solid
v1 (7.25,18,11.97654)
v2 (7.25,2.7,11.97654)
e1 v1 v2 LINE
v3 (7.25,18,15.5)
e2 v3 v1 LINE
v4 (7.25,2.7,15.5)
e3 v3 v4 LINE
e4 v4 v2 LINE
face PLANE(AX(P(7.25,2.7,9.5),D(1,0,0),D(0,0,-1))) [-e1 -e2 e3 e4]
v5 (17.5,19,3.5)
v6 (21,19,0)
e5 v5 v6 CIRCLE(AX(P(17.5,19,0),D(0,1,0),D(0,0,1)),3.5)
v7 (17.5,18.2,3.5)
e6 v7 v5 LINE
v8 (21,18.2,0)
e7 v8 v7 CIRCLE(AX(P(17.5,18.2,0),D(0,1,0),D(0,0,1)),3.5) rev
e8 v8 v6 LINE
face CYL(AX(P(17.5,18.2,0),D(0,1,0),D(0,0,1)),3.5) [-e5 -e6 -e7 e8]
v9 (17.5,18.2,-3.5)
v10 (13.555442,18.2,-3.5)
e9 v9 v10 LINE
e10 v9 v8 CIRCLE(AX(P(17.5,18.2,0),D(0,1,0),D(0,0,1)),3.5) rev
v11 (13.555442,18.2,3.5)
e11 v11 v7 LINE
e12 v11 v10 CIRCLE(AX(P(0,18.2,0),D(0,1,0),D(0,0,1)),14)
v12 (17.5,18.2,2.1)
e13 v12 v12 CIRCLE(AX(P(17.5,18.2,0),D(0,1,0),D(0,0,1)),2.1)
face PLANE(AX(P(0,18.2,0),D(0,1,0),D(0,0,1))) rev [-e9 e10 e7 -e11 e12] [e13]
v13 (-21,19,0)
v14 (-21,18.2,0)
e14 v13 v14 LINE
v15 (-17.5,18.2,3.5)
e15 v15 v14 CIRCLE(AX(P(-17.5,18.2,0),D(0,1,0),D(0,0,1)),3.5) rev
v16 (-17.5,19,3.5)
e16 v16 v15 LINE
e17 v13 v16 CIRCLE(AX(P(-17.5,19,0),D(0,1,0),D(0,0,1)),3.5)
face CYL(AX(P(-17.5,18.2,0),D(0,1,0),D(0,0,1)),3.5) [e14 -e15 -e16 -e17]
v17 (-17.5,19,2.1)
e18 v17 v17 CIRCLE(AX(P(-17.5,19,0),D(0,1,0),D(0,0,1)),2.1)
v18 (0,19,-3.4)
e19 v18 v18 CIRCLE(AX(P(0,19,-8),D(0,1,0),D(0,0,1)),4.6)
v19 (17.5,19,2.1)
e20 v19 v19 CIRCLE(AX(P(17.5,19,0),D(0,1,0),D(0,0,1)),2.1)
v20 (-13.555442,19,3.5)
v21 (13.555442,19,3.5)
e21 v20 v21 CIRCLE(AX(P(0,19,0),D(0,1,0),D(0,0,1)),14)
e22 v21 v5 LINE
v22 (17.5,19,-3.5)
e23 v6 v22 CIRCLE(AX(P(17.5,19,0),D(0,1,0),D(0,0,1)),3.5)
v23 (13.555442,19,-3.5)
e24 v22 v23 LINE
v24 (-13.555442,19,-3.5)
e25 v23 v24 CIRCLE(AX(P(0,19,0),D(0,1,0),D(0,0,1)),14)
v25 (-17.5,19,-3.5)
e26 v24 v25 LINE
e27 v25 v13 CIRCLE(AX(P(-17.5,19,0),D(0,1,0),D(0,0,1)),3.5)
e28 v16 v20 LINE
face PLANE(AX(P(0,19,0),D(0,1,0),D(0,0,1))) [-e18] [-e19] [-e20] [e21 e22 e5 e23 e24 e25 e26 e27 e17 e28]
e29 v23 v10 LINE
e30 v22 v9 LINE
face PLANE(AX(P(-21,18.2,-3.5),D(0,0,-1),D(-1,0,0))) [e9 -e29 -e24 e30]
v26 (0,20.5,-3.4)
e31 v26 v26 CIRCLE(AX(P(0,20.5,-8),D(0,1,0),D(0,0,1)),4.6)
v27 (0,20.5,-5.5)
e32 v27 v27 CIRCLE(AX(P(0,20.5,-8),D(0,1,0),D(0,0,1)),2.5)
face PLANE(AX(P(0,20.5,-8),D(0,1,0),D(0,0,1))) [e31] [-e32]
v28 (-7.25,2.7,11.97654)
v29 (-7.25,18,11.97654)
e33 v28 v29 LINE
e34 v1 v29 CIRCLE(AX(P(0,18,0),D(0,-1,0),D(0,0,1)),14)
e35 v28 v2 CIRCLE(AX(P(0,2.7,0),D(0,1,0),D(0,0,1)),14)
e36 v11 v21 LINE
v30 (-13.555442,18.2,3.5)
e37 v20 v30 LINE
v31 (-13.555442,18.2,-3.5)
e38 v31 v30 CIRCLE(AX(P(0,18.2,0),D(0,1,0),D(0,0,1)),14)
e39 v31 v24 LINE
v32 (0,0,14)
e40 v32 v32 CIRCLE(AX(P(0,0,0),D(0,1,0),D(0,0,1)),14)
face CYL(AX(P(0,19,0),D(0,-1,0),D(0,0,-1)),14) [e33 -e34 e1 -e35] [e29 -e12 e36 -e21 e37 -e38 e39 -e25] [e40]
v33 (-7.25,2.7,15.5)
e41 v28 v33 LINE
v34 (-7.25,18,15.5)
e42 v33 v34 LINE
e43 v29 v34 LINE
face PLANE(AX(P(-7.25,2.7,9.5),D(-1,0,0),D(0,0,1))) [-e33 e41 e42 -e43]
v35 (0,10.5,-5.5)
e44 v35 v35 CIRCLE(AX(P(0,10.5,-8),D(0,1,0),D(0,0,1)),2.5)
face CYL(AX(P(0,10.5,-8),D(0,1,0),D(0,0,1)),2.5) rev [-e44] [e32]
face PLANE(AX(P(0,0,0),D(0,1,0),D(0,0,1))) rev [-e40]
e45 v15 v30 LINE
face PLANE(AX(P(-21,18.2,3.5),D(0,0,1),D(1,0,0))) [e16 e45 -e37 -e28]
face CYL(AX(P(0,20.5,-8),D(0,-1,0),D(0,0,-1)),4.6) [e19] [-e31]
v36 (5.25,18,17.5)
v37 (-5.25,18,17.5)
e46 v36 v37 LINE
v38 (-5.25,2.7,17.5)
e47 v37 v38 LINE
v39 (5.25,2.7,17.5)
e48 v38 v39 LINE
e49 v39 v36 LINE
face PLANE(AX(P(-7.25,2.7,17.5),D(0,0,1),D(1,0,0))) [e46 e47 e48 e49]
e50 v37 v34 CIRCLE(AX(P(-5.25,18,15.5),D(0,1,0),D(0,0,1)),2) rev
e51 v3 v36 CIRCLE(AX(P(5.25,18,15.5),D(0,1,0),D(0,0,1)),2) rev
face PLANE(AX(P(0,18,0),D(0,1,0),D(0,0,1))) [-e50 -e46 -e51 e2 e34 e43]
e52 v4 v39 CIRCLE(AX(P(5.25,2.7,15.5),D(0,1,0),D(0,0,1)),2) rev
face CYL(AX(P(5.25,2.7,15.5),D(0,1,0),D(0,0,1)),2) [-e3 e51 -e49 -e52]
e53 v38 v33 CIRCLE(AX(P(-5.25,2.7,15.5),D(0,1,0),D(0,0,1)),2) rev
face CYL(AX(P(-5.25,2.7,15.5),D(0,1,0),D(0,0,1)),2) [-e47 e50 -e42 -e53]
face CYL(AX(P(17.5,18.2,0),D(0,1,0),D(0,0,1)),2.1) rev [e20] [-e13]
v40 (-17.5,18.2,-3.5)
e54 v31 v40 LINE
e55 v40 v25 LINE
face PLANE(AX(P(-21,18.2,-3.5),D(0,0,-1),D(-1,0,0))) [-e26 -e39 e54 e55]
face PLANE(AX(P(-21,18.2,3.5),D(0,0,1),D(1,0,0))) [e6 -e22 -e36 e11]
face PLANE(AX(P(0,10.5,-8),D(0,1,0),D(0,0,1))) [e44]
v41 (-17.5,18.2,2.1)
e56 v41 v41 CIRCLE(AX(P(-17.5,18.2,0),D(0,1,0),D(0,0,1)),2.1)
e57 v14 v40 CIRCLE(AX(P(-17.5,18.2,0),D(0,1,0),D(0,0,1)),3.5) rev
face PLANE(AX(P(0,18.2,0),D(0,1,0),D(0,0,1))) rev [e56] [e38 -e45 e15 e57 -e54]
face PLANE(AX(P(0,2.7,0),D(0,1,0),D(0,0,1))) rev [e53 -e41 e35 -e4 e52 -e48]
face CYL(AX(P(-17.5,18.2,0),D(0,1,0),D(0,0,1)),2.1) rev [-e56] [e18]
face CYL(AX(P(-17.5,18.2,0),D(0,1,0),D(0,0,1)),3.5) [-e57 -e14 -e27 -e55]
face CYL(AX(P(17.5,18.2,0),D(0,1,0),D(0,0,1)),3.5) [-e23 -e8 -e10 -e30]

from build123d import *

# Parameters (mm, degrees)
ESQUISSE1_R             = 14
BOSS_EXTRU_1_DEPTH      = 19
ESQUISSE2_W             = 42
ESQUISSE2_H             = 7
ESQUISSE2_R             = 2.1
BOSS_EXTRU_2_DEPTH      = 0.8
CONG_1_R                = 3.5
ESQUISSE3_W             = 14.5
ESQUISSE3_H             = 8
BOSS_EXTRU_3_DEPTH      = 16.3
CONG_2_R                = 2
ESQUISSE4_R             = 4.6
BOSS_EXTRU_4_DEPTH      = 1.5
ESQUISSE5_R             = 2.5
BOSS_EXTRU_5_DEPTH      = 8.5
ESQUISSE6_W             = 12.644639
ESQUISSE6_H             = 4.455106
ESQUISSE6_W_2           = 15.068741
ESQUISSE6_H_2           = 4.782687
ENL_V_MAT_EXTRU_1_DEPTH = 6
ENL_V_START             = -1
ENL_V_MAT_EXTRU_2_DEPTH = 1
ENL_V_START_2           = -18.5
ESQUISSE8_R             = 2.5
ENL_V_MAT_EXTRU_3_DEPTH = 18.5


with BuildPart() as part:
    # Esquisse1 → Boss.-Extru.1 (new body)
    with BuildSketch(Plane(origin=(0, 0, 0), x_dir=(1, 0, 0), z_dir=(0, 1, 0))):
        with Locations(Location((0, 0, 0), (0, 0, 270))):
            Circle(ESQUISSE1_R)
    extrude(amount=BOSS_EXTRU_1_DEPTH)

    # Esquisse2 → Boss.-Extru.2 (add)
    with BuildSketch(Plane(origin=(0, 19, 0), x_dir=(1, 0, 0), z_dir=(0, 1, 0))):
        Rectangle(ESQUISSE2_W, ESQUISSE2_H)
        with Locations(Location((-17.5, 0, 0), (0, 0, 270))):
            Circle(ESQUISSE2_R, mode=Mode.SUBTRACT)
        with Locations(Location((17.5, 0, 0), (0, 0, 270))):
            Circle(ESQUISSE2_R, mode=Mode.SUBTRACT)
    extrude(amount=-BOSS_EXTRU_2_DEPTH)

    # Congé1
    cong_1_edges = [part.edges().sort_by_distance(p)[0] for p in [
        (21, 18.6, 3.5),
        (21, 18.6, -3.5),
        (-21, 18.6, 3.5),
        (-21, 18.6, -3.5),
    ]]
    fillet(cong_1_edges, radius=CONG_1_R - 0.0001)  # a hair under: the kernel refuses the full size

    # Esquisse3 → Boss.-Extru.3 (add)
    with BuildSketch(Plane(origin=(0, 19, 0), x_dir=(1, 0, 0), z_dir=(0, 1, 0))):
        with Locations((0, -13.5)):
            Rectangle(ESQUISSE3_W, ESQUISSE3_H)
    extrude(amount=-BOSS_EXTRU_3_DEPTH)

    # Congé2
    cong_2_edges = [part.edges().sort_by_distance(p)[0] for p in [
        (-7.25, 10.85, 17.5),
        (7.25, 10.85, 17.5),
    ]]
    fillet(cong_2_edges, radius=CONG_2_R)

    # Esquisse4 → Boss.-Extru.4 (add)
    with BuildSketch(Plane(origin=(0, 19, 0), x_dir=(1, 0, 0), z_dir=(0, 1, 0))):
        with Locations(Location((0, 8, 0), (0, 0, 270))):
            Circle(ESQUISSE4_R)
    extrude(amount=BOSS_EXTRU_4_DEPTH)

    # Esquisse5 → Boss.-Extru.5 (add)
    with BuildSketch(Plane(origin=(0, 20.5, 0), x_dir=(1, 0, 0), z_dir=(0, 1, 0))):
        with Locations(Location((0, 8, 0), (0, 0, 270))):
            Circle(ESQUISSE5_R)
    extrude(amount=BOSS_EXTRU_5_DEPTH)

    # Esquisse6 → Enlèv. mat.-Extru.1 (cut)
    with BuildSketch(Plane(origin=(0, 29, 0), x_dir=(1, 0, 0), z_dir=(0, 1, 0))):
        with Locations((0.098275, 11.727553)):
            Rectangle(ESQUISSE6_W, ESQUISSE6_H)
        with Locations((0.065517, 4.108657)):
            Rectangle(ESQUISSE6_W_2, ESQUISSE6_H_2)
    extrude(amount=-ENL_V_MAT_EXTRU_1_DEPTH, mode=Mode.SUBTRACT)

    # Esquisse7 → Enlèv. mat.-Extru.2 (cut)
    with BuildSketch(Plane(origin=(0, 19, 0), x_dir=(1, 0, 0), z_dir=(0, 1, 0)).offset(ENL_V_START)):
        with BuildLine():
            Line((-7.25, -11.97654), (-7.25, -22.169225))
            Line((-7.25, -22.169225), (7.25, -22.169225))
            Line((7.25, -22.169225), (7.25, -11.97654))
            ThreePointArc((7.25, -11.97654), (0, -14), (-7.25, -11.97654))
        make_face()
    extrude(amount=ENL_V_MAT_EXTRU_2_DEPTH, mode=Mode.SUBTRACT)

    # Esquisse8 → Enlèv. mat.-Extru.3 (cut)
    with BuildSketch(Plane(origin=(0, 29, 0), x_dir=(1, 0, 0), z_dir=(0, 1, 0)).offset(ENL_V_START_2)):
        with Locations(Location((0, 8, 0), (0, 0, 270))):
            Circle(ESQUISSE8_R)
    extrude(amount=ENL_V_MAT_EXTRU_3_DEPTH, mode=Mode.SUBTRACT)


solid = part.part
